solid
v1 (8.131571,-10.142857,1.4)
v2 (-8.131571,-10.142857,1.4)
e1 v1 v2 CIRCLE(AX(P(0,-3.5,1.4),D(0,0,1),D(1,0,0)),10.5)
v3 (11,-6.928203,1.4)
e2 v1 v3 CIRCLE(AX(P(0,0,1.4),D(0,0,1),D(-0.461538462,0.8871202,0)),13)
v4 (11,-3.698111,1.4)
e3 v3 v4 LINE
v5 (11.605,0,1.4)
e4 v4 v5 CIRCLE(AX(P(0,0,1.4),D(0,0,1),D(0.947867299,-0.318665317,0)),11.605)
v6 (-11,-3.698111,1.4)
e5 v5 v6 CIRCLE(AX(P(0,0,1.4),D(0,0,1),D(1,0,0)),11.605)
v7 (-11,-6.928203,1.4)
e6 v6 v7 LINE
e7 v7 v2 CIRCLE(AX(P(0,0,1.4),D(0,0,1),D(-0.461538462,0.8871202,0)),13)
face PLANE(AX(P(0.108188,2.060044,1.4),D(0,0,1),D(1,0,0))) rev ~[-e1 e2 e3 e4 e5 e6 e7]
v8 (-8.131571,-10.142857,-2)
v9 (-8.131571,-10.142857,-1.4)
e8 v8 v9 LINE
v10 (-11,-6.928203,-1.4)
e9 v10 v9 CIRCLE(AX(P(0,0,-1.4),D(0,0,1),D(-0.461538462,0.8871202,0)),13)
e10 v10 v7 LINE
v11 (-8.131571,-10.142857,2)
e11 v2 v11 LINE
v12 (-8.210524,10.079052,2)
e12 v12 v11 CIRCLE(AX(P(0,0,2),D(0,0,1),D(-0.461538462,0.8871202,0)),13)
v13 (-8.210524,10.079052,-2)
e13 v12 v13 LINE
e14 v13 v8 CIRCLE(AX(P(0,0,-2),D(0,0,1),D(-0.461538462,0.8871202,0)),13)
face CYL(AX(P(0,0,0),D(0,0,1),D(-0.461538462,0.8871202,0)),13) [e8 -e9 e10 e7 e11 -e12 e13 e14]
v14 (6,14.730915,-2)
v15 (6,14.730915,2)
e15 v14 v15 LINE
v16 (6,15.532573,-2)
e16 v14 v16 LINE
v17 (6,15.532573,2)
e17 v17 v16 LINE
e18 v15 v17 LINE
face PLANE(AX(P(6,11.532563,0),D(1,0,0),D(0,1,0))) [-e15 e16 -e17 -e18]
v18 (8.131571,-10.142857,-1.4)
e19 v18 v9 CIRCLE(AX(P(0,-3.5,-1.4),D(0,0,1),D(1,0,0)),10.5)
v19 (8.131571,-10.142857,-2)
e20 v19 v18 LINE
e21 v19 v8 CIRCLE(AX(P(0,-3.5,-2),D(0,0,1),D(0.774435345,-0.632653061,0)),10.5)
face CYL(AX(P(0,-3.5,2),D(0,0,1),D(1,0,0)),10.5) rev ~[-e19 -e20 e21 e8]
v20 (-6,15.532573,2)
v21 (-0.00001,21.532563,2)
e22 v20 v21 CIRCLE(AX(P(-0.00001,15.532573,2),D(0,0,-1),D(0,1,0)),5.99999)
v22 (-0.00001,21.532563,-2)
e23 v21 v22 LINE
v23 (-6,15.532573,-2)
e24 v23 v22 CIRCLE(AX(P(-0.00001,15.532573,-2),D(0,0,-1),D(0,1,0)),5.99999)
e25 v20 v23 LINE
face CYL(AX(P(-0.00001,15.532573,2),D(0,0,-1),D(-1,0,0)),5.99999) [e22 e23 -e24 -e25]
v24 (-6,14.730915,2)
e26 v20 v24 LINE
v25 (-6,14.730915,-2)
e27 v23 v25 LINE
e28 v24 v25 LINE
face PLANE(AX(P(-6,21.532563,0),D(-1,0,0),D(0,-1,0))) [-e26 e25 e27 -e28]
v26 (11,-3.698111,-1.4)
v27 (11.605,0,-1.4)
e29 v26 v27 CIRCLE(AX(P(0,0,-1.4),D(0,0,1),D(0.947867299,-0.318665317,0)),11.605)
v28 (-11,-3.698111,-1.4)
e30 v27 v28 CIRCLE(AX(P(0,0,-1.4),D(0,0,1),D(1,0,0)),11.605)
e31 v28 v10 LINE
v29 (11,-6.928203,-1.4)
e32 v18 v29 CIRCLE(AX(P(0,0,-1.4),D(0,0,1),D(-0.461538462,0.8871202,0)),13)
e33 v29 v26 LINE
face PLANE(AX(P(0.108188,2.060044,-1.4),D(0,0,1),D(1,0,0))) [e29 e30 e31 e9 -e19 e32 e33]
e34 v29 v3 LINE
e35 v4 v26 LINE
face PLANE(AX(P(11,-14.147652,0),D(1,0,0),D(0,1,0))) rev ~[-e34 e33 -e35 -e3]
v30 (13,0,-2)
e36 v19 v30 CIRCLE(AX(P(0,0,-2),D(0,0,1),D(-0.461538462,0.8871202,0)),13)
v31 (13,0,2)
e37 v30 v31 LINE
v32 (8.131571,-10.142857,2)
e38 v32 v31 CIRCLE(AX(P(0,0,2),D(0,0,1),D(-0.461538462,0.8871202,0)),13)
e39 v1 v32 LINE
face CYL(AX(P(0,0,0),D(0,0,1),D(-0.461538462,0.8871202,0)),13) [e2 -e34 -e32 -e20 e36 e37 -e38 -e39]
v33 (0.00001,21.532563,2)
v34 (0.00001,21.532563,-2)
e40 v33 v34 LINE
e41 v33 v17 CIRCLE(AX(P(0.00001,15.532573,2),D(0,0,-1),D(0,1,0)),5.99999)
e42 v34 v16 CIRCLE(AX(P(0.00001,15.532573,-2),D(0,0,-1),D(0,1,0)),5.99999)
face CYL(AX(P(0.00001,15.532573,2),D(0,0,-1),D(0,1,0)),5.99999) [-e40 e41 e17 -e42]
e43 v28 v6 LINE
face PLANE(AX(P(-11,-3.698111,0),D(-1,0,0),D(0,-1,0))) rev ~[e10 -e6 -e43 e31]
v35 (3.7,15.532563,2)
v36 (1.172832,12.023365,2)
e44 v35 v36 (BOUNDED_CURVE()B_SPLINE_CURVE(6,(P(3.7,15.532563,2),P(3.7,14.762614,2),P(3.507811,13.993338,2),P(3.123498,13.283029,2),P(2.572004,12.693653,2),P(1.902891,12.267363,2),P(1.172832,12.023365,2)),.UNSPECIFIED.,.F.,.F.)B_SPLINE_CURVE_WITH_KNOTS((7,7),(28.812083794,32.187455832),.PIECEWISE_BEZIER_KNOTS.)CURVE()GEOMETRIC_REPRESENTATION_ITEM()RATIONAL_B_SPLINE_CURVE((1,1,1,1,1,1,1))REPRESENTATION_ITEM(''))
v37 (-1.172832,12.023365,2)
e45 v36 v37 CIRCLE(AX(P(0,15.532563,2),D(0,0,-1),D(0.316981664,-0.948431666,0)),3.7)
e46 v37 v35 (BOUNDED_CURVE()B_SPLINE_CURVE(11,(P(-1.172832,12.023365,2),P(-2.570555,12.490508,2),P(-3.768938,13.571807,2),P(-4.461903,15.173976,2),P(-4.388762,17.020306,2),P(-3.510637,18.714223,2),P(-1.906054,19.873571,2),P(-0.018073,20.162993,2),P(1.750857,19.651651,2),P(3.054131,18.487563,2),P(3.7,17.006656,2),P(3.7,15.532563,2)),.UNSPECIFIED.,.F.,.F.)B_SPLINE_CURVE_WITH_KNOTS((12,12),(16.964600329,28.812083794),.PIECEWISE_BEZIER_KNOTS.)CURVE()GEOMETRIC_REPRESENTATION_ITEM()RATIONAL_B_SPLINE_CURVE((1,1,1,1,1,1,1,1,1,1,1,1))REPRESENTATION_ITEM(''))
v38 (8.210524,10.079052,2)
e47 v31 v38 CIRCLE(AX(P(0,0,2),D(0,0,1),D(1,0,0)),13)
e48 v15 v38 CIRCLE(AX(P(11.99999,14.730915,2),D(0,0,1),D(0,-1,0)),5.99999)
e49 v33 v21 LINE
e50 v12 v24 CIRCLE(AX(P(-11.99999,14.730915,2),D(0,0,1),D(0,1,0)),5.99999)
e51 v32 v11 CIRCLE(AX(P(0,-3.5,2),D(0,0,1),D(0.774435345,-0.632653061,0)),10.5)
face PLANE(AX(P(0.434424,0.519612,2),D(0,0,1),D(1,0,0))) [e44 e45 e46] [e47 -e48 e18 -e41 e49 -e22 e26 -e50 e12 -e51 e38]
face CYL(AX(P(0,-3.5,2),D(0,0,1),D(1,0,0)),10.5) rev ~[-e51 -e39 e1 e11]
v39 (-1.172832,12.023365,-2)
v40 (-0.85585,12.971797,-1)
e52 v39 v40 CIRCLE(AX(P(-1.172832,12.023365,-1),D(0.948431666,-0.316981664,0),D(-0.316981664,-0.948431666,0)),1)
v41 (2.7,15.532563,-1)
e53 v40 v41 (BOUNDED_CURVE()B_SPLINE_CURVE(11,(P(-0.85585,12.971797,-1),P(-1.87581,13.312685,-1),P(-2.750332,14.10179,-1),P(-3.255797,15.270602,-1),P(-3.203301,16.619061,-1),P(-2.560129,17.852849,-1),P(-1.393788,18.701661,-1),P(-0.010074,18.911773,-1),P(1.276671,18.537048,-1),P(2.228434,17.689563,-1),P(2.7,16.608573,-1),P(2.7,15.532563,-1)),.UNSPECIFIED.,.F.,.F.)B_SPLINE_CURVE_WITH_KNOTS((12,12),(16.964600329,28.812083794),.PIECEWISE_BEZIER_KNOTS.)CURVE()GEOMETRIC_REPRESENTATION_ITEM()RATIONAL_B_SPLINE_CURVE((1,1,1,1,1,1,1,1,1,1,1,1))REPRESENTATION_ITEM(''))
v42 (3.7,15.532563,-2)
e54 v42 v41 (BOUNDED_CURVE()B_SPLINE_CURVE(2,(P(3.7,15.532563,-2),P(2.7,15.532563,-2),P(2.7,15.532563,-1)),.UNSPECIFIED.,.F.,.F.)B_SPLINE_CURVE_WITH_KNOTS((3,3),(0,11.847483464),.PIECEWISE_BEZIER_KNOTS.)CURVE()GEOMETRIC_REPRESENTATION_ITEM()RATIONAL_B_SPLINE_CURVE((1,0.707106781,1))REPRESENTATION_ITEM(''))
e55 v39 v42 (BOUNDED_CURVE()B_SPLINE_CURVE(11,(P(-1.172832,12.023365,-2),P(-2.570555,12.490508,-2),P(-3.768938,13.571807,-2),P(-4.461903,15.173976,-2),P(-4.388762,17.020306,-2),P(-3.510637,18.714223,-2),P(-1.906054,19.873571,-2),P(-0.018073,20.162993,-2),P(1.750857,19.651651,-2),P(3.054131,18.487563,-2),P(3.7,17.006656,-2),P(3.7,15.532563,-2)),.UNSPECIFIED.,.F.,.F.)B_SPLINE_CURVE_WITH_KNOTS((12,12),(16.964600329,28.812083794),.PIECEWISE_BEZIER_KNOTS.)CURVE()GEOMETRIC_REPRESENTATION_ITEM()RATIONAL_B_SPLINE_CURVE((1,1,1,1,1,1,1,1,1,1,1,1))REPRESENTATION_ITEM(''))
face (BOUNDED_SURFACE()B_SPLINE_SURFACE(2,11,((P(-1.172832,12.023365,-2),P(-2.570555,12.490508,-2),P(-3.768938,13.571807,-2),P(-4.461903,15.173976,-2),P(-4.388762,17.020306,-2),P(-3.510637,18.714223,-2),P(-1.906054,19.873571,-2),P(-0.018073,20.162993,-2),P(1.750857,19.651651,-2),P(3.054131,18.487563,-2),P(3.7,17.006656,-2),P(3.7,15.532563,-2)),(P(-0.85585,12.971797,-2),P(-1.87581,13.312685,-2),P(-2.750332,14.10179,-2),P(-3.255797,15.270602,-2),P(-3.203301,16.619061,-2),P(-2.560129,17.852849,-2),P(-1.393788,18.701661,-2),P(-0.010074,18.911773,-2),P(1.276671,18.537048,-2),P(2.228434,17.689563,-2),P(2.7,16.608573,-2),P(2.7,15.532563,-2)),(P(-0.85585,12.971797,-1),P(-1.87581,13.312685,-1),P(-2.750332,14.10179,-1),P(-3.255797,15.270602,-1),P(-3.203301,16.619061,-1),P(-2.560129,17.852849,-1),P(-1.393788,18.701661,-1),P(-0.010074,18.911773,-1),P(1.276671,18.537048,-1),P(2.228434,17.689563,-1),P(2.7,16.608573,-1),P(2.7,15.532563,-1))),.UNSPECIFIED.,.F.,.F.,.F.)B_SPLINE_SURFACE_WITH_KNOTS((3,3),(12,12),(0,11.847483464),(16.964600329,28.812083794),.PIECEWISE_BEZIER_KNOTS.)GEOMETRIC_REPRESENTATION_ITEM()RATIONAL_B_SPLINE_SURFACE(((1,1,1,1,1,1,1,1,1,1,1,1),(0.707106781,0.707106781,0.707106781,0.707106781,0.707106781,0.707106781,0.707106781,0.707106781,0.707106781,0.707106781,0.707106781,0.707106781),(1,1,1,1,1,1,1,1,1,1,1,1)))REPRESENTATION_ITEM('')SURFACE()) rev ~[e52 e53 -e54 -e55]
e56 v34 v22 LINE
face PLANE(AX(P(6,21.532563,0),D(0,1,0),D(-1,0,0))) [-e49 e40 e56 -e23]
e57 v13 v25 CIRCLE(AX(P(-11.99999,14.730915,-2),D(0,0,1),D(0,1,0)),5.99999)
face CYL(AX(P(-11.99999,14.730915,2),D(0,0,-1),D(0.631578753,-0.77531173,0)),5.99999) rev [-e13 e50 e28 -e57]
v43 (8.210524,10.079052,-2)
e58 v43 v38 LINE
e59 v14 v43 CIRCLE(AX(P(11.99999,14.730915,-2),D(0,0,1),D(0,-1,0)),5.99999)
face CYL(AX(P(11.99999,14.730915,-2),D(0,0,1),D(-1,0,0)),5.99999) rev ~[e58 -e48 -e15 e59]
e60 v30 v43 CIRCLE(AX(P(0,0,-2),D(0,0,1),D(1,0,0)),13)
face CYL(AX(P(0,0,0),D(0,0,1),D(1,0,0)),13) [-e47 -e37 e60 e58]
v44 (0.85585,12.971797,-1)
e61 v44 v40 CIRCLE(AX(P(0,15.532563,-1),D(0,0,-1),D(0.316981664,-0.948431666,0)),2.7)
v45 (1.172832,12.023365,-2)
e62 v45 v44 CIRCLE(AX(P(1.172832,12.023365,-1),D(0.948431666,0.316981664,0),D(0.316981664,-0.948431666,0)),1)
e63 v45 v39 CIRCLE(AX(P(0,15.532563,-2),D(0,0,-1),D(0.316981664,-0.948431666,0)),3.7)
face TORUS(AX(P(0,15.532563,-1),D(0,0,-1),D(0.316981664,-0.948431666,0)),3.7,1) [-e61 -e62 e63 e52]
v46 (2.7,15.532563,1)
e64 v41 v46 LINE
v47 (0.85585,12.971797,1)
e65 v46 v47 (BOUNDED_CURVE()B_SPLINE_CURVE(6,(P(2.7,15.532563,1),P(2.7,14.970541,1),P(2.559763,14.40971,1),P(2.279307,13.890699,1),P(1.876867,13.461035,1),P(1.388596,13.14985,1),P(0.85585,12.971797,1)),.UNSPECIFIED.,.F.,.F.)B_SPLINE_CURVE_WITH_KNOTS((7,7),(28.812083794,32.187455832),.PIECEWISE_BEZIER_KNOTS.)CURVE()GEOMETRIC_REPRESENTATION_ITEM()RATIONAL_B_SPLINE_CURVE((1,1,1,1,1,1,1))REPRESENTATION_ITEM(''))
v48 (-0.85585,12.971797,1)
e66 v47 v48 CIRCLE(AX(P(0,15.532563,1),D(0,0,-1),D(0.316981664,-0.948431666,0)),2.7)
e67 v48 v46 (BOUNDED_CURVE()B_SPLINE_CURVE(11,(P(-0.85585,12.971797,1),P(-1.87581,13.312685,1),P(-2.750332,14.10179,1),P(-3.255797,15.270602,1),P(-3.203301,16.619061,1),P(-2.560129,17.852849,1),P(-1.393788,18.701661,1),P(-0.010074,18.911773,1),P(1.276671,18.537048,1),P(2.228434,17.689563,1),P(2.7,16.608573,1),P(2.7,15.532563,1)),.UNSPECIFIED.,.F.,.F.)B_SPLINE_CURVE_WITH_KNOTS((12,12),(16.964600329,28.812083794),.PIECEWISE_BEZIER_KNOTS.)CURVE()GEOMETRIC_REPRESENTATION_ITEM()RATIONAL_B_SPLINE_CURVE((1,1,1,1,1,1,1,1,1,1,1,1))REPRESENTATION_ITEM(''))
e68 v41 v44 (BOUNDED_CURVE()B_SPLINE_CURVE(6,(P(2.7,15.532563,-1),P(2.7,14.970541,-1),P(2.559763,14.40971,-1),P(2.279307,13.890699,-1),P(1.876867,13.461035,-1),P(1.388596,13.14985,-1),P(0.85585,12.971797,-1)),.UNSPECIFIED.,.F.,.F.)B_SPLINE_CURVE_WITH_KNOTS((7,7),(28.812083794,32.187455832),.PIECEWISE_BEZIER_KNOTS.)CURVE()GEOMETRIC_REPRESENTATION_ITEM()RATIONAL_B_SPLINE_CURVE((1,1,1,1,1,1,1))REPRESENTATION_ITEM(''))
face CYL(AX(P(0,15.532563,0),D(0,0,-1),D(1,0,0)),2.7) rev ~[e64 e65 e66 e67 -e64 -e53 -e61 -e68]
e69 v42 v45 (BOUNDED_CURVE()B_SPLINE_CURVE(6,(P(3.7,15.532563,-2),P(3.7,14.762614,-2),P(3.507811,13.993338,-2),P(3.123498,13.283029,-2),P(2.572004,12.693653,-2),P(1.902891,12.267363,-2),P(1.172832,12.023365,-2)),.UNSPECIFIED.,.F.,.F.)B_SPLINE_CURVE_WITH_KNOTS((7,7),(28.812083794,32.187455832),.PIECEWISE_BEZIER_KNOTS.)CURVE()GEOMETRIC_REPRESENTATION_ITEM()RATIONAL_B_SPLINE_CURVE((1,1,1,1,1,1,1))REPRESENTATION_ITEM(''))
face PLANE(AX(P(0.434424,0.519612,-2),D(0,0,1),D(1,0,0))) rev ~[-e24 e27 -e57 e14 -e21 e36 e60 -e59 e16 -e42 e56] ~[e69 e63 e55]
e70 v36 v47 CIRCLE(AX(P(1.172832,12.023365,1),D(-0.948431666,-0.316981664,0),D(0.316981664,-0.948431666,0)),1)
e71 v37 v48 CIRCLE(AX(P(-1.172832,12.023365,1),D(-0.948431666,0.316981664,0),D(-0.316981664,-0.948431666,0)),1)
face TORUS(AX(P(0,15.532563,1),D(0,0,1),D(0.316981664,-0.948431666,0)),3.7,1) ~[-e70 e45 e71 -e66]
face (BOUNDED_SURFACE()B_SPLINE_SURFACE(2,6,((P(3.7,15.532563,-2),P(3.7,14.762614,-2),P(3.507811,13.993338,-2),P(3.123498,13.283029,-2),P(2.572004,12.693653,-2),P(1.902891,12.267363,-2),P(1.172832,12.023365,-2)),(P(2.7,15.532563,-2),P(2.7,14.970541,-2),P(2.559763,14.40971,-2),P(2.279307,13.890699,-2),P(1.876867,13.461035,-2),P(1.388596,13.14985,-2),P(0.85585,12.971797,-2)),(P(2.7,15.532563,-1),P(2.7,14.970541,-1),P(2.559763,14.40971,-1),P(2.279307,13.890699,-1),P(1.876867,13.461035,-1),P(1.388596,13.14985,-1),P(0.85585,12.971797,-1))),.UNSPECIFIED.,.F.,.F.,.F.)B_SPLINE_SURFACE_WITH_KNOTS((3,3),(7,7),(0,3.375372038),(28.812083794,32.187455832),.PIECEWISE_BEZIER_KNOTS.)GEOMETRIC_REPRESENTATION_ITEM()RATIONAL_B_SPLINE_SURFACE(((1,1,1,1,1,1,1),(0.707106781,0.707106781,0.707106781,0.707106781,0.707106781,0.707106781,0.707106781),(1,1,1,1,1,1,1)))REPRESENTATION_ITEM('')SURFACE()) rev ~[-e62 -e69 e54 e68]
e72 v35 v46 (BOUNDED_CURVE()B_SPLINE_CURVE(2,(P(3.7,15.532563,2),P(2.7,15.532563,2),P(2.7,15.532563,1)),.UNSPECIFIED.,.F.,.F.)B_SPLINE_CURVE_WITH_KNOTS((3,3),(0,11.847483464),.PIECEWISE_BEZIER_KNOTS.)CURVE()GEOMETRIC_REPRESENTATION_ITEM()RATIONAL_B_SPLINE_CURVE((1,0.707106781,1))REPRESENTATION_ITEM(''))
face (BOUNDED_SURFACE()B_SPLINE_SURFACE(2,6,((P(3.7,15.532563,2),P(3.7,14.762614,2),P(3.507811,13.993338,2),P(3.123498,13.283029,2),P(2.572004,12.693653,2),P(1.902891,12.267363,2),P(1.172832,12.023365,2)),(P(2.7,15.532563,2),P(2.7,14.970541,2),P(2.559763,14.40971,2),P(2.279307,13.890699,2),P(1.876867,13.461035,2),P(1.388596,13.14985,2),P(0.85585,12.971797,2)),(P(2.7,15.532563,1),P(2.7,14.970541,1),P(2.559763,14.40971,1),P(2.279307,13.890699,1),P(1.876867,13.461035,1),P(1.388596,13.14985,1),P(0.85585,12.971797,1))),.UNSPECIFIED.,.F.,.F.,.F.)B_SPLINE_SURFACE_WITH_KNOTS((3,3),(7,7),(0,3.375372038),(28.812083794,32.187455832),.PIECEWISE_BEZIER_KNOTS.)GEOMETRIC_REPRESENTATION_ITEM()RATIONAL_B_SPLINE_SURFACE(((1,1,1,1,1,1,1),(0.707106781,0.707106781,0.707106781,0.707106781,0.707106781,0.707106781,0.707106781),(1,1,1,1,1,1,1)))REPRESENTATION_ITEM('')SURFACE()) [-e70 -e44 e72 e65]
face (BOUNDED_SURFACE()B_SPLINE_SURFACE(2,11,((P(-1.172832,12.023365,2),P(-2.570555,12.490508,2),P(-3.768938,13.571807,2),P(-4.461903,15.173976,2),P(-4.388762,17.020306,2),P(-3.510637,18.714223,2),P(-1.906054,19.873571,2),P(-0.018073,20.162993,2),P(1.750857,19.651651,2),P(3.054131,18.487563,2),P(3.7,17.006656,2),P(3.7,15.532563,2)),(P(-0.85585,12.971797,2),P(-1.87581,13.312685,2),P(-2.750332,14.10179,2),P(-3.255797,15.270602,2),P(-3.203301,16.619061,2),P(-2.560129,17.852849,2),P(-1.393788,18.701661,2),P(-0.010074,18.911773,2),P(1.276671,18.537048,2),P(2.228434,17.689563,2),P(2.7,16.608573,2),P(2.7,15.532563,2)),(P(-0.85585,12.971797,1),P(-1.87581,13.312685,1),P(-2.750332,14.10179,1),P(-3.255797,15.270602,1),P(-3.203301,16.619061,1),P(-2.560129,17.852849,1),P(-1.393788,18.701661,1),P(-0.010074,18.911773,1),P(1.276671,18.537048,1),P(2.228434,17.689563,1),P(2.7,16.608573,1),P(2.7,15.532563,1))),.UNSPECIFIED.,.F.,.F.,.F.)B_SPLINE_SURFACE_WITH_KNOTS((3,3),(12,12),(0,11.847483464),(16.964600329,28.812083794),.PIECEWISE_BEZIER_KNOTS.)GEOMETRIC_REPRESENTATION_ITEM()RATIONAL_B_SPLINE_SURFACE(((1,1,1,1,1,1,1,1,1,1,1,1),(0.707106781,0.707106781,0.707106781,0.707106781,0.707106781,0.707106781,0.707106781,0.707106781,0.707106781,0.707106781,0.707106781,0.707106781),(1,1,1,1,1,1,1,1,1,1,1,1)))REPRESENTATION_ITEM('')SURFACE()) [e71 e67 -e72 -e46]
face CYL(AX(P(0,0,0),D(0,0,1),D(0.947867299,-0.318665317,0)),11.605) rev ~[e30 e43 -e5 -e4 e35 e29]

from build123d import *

# Parameters (mm, degrees)
F1_DEPTH = 2
F2_R     = 5.99999
F3_R     = 1
F4_R     = 10.5
F5_DEPTH = 4.001
F7_DEPTH = 1.4


# Not quite as in the source:
# - a fillet or chamfer is up to 0.001 mm smaller than in the source, because OpenCascade refuses the exact size


with BuildPart() as f1:
    # F0 (on Top) → F1 (new body, symmetric)
    with BuildSketch(Plane.XY):
        with BuildLine():
            ThreePointArc((-6, 11.5325625947), (-6.7453687816, -11.1130553854), (13, 0))
            ThreePointArc((13, 0), (11.1130553854, 6.7453687816), (6, 11.5325625947))
            Line((6, 11.5325625947), (-6, 11.5325625947))
        make_face()
        with BuildLine():
            Line((-6, 11.5325625947), (6, 11.5325625947))
            ThreePointArc((6, 11.5325625947), (3.5026447844, 12.5192443667), (0.8558504936, 12.9717970973))
            ThreePointArc((0.8558504936, 12.9717970973), (0, 12.8325625947), (-0.8558504936, 12.9717970973))
            ThreePointArc((-0.8558504936, 12.9717970973), (-3.5026447844, 12.5192443667), (-6, 11.5325625947))
        make_face()
        with BuildLine():
            ThreePointArc((0.8558504936, 12.9717970973), (3.5026447844, 12.5192443667), (6, 11.5325625947))
            Line((6, 11.5325625947), (6, 21.5325625947))
            Line((6, 21.5325625947), (-6, 21.5325625947))
            Line((-6, 21.5325625947), (-6, 11.5325625947))
            ThreePointArc((-6, 11.5325625947), (-3.5026447844, 12.5192443667), (-0.8558504936, 12.9717970973))
            ThreePointArc((-0.8558504936, 12.9717970973), (-1.5778472149, 17.7235436914), (2.7, 15.5325625947))
            ThreePointArc((2.7, 15.5325625947), (2.1909810967, 13.9547153797), (0.8558504936, 12.9717970973))
        make_face()
    extrude(amount=F1_DEPTH, both=True)

    # F2 (radius 6 in the source; OpenCascade refuses exactly that, so slightly less here)
    f2_edges = [f1.edges().sort_by_distance(p)[0] for p in [
        (-6, 21.532563, 0),
        (6, 21.532563, 0),
        (6, 11.532563, 0),
        (-6, 11.532563, 0),
    ]]
    fillet(f2_edges, radius=F2_R)

    # F3
    f3_edges = [f1.edges().sort_by_distance(p)[0] for p in [
        (0.85585, 18.093328, 2),
        (0.85585, 18.093328, -2),
    ]]
    fillet(f3_edges, radius=F3_R)

    # F4 (on face) → F5 (cut, through all)
    with BuildSketch(Plane.XY.offset(2)):
        with Locations((0, -3.5)):
            Circle(F4_R)
    extrude(amount=-F5_DEPTH, mode=Mode.SUBTRACT)

    # F6 (on Top) → F7 (cut, symmetric)
    with BuildSketch(Plane.XY):
        with BuildLine():
            ThreePointArc((11, -3.6981110043), (11.452751307, -1.8736361707), (11.605, 0))
            ThreePointArc((11.605, 0), (-1.8736361707, 11.452751307), (-11, -3.6981110043))
            Line((-11, -3.6981110043), (11, -3.6981110043))
        make_face()
        with BuildLine():
            Line((11, -3.6981110043), (-11, -3.6981110043))
            ThreePointArc((-11, -3.6981110043), (0, -11.605), (11, -3.6981110043))
        make_face()
        with BuildLine():
            ThreePointArc((11, -3.6981110043), (0, -11.605), (-11, -3.6981110043))
            Line((-11, -3.6981110043), (-11, -14.1476519146))
            Line((-11, -14.1476519146), (11, -14.1476519146))
            Line((11, -14.1476519146), (11, -3.6981110043))
        make_face()
    extrude(amount=F7_DEPTH, both=True, mode=Mode.SUBTRACT)


solid = f1.part
